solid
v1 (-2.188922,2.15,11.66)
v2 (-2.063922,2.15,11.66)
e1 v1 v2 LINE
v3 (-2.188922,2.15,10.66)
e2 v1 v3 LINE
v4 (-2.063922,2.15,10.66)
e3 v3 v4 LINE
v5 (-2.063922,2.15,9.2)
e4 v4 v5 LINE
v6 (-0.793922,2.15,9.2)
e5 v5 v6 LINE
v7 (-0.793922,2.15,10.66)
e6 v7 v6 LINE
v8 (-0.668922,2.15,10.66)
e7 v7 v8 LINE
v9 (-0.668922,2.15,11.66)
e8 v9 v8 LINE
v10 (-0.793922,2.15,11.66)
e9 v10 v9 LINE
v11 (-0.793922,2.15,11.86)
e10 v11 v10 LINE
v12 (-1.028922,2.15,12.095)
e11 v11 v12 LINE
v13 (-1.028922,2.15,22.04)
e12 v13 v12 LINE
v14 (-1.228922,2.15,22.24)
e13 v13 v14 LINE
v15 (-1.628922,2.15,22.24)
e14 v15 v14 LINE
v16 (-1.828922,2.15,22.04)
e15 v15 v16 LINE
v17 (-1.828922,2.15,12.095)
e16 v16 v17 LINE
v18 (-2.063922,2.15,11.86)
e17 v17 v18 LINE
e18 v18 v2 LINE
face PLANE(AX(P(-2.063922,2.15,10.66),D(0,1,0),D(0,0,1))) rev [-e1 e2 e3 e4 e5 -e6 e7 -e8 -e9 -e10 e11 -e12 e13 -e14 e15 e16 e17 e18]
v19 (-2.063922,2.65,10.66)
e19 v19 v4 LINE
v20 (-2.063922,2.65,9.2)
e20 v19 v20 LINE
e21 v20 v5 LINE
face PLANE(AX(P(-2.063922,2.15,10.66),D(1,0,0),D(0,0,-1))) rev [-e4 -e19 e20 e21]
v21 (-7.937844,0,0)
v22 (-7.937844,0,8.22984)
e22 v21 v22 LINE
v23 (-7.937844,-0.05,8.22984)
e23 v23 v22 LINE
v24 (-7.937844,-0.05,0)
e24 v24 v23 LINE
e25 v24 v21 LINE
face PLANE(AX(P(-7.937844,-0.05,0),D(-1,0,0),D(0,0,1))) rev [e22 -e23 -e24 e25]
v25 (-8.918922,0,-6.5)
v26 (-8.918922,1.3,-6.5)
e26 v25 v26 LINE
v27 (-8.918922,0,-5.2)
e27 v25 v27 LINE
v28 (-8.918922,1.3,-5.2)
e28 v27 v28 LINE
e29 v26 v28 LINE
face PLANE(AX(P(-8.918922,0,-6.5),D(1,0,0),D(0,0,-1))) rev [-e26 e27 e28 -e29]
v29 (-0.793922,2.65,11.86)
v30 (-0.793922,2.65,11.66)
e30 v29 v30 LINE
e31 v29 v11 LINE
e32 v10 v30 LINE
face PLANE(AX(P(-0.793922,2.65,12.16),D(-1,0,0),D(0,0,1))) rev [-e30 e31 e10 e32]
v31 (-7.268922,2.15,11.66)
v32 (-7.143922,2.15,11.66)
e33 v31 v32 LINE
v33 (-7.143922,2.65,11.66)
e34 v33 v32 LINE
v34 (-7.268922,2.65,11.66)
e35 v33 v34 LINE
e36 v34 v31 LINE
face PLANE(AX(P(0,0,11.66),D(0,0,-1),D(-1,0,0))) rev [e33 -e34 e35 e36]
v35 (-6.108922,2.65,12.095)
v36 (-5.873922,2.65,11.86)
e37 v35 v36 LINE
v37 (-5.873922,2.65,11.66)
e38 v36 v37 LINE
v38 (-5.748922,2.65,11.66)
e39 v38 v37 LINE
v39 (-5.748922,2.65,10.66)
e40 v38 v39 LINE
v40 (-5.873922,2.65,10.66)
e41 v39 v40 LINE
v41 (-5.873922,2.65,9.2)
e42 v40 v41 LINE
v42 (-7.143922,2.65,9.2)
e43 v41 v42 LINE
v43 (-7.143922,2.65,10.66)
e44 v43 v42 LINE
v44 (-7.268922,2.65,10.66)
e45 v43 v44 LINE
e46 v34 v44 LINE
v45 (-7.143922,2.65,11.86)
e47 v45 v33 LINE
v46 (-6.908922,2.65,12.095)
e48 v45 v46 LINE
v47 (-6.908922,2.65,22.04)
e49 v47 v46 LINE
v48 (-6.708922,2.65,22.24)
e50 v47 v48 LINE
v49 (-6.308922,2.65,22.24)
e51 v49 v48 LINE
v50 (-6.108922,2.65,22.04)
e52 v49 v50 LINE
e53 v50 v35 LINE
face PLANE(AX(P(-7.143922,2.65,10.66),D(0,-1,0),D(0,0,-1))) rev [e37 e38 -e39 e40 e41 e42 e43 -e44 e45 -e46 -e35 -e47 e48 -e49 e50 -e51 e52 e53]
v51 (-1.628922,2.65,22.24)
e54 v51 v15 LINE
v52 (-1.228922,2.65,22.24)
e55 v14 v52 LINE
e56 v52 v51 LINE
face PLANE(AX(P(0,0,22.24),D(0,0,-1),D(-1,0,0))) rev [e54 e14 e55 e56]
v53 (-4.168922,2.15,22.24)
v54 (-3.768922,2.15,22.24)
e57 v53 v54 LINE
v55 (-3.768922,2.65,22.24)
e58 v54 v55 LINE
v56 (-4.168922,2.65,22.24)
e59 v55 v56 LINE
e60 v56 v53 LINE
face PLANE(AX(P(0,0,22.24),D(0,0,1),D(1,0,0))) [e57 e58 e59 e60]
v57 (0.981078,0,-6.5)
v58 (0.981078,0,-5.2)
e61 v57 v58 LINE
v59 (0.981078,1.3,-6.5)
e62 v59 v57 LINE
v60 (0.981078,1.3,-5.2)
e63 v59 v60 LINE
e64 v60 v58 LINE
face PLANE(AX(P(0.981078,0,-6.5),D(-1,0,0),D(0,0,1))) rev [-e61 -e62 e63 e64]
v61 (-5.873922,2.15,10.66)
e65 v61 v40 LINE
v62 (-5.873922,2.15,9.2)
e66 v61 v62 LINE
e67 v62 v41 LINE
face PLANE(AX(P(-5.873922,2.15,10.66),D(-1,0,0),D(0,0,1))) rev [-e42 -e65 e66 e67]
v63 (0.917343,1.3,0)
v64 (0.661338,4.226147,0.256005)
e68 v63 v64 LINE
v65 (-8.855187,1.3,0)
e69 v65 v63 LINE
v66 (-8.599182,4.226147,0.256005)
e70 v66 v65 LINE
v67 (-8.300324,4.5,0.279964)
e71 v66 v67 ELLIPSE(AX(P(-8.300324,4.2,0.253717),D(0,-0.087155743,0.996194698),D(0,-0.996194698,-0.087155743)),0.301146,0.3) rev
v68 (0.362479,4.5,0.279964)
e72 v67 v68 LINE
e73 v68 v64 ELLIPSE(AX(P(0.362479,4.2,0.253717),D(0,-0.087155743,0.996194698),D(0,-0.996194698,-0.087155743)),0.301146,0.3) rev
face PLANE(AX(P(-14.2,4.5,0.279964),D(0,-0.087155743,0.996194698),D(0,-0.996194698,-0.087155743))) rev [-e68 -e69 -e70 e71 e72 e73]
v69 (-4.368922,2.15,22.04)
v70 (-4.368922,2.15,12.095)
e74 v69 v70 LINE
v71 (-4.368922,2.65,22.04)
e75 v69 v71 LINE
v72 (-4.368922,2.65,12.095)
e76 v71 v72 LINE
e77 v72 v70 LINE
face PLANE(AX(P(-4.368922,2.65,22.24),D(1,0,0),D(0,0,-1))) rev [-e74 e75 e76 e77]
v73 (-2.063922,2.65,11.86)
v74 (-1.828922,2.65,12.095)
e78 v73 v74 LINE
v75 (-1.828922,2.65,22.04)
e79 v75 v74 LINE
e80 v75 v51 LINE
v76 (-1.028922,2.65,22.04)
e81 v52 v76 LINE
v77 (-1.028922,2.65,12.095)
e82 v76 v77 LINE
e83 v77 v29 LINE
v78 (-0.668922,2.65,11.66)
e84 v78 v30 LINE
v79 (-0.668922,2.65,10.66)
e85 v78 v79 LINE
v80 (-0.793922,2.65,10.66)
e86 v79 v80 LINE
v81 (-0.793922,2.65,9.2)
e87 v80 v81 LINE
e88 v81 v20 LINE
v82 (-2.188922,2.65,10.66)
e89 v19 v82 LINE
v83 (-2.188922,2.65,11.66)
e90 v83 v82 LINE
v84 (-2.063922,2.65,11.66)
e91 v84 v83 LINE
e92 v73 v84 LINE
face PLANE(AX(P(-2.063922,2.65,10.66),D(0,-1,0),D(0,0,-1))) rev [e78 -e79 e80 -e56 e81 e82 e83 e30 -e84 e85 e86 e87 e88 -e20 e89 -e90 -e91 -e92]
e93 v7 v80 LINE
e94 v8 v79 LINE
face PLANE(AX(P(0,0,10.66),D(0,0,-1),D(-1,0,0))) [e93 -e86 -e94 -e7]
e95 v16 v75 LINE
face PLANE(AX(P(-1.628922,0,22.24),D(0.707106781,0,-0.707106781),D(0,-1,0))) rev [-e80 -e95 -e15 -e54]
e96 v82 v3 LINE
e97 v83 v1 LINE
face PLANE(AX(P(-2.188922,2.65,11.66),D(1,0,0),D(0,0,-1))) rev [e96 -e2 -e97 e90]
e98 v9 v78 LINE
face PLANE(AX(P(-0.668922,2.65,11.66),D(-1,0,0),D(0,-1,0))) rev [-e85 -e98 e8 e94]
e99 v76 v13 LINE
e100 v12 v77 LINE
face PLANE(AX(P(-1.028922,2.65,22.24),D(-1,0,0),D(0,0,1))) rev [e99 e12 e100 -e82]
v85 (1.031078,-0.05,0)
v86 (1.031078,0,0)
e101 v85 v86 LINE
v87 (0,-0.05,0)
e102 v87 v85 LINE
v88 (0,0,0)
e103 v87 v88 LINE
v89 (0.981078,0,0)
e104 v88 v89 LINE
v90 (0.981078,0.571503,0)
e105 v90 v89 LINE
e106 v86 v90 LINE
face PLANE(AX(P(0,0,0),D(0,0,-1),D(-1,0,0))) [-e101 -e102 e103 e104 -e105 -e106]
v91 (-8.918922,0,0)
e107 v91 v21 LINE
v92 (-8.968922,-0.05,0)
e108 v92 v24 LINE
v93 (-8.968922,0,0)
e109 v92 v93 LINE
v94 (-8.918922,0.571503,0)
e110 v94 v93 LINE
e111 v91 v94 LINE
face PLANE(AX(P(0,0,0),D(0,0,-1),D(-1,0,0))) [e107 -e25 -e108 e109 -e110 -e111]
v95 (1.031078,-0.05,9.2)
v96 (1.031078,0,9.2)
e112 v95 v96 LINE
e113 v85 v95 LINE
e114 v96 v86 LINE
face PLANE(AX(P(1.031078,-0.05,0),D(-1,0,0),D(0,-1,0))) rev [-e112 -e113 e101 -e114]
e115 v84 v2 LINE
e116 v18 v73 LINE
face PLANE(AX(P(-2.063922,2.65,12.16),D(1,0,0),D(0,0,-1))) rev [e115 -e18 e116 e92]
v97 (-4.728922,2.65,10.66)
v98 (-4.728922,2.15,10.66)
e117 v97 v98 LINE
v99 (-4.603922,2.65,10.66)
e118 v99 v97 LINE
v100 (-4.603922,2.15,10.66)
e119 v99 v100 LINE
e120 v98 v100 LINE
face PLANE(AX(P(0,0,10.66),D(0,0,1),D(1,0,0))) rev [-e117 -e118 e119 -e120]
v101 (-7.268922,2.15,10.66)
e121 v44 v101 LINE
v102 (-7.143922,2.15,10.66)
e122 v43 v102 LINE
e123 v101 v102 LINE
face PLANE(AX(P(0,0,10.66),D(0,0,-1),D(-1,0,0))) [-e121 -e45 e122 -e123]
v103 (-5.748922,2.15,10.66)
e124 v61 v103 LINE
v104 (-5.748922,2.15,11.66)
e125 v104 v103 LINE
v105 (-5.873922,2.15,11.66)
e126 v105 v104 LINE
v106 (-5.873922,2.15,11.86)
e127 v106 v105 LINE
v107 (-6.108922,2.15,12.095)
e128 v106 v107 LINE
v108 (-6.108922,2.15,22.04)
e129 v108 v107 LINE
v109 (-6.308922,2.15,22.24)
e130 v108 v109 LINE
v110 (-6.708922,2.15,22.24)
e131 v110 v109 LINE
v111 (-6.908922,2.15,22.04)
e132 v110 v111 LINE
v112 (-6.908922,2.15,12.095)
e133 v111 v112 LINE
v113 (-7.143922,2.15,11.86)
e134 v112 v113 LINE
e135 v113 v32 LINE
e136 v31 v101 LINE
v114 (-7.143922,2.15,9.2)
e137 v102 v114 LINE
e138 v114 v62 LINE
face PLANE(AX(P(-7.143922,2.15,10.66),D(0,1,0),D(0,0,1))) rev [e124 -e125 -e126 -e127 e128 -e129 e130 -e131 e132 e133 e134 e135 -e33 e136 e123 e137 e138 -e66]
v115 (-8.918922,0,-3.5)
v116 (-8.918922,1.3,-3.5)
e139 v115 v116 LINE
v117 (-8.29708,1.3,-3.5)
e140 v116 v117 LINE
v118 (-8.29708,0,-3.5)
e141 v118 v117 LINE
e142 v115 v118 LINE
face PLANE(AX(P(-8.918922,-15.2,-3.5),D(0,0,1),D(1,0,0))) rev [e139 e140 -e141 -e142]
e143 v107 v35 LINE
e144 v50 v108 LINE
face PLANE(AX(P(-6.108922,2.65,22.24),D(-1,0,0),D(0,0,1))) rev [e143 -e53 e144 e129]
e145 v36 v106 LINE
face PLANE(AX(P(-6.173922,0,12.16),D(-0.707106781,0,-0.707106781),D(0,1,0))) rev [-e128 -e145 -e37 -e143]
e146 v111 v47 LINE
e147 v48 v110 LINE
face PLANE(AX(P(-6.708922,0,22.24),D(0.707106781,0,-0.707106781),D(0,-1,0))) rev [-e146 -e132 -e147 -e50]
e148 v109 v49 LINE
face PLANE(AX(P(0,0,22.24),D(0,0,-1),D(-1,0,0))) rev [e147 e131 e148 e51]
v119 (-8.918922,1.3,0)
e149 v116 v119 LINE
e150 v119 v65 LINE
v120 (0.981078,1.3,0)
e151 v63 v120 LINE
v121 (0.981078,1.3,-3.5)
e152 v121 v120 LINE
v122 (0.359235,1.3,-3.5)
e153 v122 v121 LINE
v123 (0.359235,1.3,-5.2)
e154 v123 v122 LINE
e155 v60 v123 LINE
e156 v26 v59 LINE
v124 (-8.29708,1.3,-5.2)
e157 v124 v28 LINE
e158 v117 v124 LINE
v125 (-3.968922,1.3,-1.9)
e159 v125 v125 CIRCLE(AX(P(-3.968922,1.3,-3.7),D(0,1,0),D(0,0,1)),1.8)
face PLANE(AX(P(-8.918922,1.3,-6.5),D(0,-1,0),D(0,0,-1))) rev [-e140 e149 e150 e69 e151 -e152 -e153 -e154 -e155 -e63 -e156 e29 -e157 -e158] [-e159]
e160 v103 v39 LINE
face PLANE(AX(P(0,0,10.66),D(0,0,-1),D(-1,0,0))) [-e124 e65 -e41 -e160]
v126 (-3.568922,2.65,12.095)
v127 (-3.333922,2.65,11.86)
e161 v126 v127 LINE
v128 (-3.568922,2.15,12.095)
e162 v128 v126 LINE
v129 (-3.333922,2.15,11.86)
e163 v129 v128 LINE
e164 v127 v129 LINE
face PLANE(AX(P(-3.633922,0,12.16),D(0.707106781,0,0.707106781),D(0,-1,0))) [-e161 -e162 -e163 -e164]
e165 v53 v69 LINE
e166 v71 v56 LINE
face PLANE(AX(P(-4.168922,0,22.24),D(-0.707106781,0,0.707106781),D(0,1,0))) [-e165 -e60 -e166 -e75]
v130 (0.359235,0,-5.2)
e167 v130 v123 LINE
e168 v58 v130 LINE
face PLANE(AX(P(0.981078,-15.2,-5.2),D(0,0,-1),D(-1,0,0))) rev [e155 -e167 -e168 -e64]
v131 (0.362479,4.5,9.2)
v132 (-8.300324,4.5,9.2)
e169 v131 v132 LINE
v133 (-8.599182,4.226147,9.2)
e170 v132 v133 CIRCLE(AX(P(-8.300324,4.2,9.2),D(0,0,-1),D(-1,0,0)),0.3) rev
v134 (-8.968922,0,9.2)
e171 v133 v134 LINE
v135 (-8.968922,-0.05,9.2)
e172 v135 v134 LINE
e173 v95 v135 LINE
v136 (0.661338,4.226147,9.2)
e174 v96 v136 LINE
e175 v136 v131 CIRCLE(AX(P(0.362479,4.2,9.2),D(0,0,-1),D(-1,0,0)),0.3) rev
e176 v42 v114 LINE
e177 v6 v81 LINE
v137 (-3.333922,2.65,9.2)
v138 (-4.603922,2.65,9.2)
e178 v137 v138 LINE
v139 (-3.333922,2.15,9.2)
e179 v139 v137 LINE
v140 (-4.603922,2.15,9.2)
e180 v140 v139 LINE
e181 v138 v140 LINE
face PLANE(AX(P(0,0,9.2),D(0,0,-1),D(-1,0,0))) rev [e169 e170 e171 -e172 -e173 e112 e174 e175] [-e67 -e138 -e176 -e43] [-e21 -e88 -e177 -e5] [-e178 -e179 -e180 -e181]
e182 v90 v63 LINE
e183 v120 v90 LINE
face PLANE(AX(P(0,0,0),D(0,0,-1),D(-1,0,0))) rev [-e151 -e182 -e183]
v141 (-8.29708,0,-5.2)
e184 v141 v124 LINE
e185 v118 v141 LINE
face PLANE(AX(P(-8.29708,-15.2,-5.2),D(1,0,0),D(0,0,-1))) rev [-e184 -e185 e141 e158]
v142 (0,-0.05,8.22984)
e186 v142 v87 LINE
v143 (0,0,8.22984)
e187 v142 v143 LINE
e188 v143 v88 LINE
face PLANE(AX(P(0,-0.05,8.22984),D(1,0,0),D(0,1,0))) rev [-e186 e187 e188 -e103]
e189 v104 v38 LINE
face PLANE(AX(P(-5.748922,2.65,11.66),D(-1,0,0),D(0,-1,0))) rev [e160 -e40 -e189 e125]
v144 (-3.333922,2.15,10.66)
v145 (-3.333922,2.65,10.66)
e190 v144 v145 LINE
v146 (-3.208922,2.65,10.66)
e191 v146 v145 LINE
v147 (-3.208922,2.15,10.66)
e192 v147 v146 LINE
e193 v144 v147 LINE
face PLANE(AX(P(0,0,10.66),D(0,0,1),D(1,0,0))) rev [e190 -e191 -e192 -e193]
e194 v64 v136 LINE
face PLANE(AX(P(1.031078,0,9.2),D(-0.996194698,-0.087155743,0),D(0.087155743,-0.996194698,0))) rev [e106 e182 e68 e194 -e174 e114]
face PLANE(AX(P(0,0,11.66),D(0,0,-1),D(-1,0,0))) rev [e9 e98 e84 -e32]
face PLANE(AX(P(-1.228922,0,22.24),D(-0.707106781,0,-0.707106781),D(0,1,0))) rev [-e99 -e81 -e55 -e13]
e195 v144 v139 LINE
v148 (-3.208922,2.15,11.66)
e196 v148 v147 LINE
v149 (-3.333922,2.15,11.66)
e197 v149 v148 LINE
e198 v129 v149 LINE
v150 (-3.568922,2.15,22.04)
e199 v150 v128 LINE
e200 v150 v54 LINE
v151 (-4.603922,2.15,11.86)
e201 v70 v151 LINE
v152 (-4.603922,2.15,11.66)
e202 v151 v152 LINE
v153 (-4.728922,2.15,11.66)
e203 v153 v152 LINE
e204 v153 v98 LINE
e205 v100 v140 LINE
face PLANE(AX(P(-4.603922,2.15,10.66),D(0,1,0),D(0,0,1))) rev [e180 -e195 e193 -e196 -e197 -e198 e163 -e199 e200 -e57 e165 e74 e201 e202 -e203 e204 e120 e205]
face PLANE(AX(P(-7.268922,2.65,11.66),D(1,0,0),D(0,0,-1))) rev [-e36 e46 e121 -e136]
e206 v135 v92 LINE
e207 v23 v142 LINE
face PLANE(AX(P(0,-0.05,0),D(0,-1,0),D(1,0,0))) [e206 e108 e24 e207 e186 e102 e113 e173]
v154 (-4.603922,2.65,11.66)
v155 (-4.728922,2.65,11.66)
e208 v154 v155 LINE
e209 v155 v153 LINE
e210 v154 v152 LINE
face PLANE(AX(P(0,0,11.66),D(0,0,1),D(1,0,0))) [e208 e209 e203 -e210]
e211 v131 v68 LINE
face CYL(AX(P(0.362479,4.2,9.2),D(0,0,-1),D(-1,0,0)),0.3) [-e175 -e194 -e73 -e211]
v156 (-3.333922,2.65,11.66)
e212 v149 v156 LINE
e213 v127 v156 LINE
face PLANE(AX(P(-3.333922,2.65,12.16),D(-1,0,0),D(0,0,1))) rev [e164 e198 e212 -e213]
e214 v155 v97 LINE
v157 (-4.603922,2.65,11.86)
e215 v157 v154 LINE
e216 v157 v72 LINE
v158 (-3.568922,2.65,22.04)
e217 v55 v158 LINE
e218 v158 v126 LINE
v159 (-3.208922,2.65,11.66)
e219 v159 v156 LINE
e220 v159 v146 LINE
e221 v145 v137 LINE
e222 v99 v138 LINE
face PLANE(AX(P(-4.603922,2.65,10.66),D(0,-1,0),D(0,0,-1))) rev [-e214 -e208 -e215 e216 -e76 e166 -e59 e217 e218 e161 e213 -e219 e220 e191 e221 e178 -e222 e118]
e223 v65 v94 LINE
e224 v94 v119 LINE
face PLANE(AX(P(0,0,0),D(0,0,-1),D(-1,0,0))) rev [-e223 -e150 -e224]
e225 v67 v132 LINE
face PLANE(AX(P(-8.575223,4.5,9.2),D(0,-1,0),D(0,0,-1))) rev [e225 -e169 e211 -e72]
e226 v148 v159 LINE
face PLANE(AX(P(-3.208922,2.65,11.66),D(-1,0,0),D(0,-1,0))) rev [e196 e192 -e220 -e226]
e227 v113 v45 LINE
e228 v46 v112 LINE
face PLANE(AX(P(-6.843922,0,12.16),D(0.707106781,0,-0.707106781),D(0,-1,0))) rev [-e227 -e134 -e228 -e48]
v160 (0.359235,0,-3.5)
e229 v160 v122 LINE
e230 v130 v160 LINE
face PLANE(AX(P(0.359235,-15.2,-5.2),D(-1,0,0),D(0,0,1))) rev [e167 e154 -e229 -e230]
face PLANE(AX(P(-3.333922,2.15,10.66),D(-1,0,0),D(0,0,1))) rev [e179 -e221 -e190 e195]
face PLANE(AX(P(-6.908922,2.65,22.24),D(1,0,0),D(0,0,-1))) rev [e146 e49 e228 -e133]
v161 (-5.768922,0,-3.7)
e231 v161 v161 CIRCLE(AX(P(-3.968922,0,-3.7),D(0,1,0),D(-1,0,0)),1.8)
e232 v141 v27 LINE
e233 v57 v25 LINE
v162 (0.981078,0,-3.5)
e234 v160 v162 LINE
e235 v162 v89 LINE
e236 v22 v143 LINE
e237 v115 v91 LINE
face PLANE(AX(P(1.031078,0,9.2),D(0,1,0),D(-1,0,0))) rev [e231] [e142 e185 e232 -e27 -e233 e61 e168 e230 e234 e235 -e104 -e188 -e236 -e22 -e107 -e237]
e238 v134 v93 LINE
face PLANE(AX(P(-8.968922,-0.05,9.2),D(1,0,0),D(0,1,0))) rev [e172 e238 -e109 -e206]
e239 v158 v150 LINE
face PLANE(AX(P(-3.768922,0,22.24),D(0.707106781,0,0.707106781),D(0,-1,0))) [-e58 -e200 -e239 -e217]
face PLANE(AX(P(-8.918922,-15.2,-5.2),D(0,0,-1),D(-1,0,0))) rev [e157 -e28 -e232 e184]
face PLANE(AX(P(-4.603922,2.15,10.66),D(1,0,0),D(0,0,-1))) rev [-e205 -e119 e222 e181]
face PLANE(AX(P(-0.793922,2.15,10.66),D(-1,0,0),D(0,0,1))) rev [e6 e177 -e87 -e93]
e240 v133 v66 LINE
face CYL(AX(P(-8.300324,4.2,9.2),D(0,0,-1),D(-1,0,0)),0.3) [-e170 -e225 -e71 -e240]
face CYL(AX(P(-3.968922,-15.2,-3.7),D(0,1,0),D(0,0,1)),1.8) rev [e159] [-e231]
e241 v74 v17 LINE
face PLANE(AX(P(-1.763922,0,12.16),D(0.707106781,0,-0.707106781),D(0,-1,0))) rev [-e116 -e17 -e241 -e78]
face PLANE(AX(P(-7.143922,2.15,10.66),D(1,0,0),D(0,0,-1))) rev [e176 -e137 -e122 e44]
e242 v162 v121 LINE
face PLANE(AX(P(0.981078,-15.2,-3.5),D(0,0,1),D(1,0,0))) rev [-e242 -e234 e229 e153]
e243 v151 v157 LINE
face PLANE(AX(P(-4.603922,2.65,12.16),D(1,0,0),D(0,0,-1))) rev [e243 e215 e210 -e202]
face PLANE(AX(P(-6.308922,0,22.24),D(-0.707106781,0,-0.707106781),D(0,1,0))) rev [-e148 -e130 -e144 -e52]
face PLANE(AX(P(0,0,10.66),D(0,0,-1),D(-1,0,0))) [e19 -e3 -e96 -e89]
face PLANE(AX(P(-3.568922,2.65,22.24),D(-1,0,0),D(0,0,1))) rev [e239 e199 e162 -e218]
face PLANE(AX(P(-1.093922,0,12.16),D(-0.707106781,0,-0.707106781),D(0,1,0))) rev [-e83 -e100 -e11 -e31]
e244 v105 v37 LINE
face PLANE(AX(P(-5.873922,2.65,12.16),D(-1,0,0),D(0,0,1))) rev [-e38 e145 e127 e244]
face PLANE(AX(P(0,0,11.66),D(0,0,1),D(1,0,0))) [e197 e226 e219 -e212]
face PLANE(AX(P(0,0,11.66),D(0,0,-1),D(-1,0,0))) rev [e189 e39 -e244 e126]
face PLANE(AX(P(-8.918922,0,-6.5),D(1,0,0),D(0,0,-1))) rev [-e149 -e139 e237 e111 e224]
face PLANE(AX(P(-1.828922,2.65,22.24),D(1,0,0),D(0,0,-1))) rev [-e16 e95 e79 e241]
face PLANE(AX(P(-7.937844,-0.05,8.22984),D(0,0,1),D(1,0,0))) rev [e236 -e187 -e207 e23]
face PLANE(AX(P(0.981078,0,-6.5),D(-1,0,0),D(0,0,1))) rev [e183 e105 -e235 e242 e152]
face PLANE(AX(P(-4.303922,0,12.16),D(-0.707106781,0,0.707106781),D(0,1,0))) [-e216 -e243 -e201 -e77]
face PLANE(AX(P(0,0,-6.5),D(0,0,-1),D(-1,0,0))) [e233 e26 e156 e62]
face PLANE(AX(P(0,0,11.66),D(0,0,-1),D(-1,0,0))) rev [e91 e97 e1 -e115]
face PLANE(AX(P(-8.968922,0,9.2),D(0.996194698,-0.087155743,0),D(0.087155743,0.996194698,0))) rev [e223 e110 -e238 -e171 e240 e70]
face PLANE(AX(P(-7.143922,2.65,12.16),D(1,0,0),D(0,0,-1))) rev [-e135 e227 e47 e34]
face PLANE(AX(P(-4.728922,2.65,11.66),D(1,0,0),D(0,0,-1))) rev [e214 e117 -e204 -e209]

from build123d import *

# Parameters (mm, degrees)
BOSS_EXTRUDE1_DEPTH  = 9.2
FILLET1_R            = 0.3
CUT_EXTRUDE1_DEPTH   = 19.2
SKETCH3_W            = 9.9
SKETCH3_H            = 1.3
BOSS_EXTRUDE2_DEPTH  = 6.5
SKETCH4_W            = 0.621842352
SKETCH4_H            = 1.7
CUT_EXTRUDE3_DEPTH   = 16.5
SKETCH5_R            = 1.8
CUT_EXTRUDE4_DEPTH   = 16.5
SKETCH8_W            = 1.27
SKETCH8_H            = 0.5
BOSS_EXTRUDE4_DEPTH  = 1.46
SKETCH9_W            = 1.52
SKETCH9_H            = 0.5
BOSS_EXTRUDE5_DEPTH  = 1
SKETCH10_W           = 1.27
SKETCH10_H           = 0.5
BOSS_EXTRUDE6_DEPTH  = 0.5
SKETCH11_W           = 0.8
SKETCH11_H           = 0.5
BOSS_EXTRUDE7_DEPTH  = 10.08
CHAMFER1_SIZE        = 0.3
CHAMFER2_SIZE        = 0.2
BOSS_EXTRUDE10_DEPTH = 0.05


with BuildPart() as part:
    # Sketch1 → Boss-Extrude1 (new body)
    with BuildSketch(Plane.XY):
        Polygon((1.031077827, 0), (-8.968922173, 0), (-8.575223187, 4.5), (0.637378841, 4.5), align=None)
    extrude(amount=BOSS_EXTRUDE1_DEPTH)

    # Fillet1
    fillet1_edges = [part.edges().sort_by_distance(p)[0] for p in [
        (-8.575223187, 4.5, 4.6),
        (0.637378841, 4.5, 4.6),
    ]]
    fillet(fillet1_edges, radius=FILLET1_R)

    # Sketch2 → Cut-Extrude1 (cut)
    with BuildSketch(Plane(origin=(5, 0, 0), x_dir=(0, 0, -1), z_dir=(1, 0, 0))):
        Polygon((0, 4.5), (-0.279963723, 4.5), (0, 1.3), align=None)
    extrude(amount=-CUT_EXTRUDE1_DEPTH, mode=Mode.SUBTRACT)

    # Sketch3 → Boss-Extrude2 (add)
    with BuildSketch(Plane(origin=(0, 0, 0), x_dir=(-1, 0, 0), z_dir=(0, 0, -1))):
        with Locations((3.968922173, 0.65)):
            Rectangle(SKETCH3_W, SKETCH3_H)
    extrude(amount=BOSS_EXTRUDE2_DEPTH)

    # Sketch4 → Cut-Extrude3 (cut)
    with BuildSketch(Plane(origin=(0, 1.3, 0), x_dir=(1, 0, 0), z_dir=(0, 1, 0))):
        with Locations((-8.608000997, 4.35)):
            Rectangle(SKETCH4_W, SKETCH4_H)
        with Locations((0.670156651, 4.35)):
            Rectangle(SKETCH4_W, SKETCH4_H)
    extrude(amount=-CUT_EXTRUDE3_DEPTH, mode=Mode.SUBTRACT)

    # Sketch5 → Cut-Extrude4 (cut)
    with BuildSketch(Plane(origin=(0, 1.3, 0), x_dir=(1, 0, 0), z_dir=(0, 1, 0))):
        with Locations(Location((-3.968922173, 3.7, 0), (0, 0, 270))):
            Circle(SKETCH5_R)
    extrude(amount=-CUT_EXTRUDE4_DEPTH, mode=Mode.SUBTRACT)

    # Sketch8 → Boss-Extrude4 (add)
    with BuildSketch(Plane.XY.offset(9.2)):
        with Locations((-1.428922173, 2.4)):
            Rectangle(SKETCH8_W, SKETCH8_H)
        with Locations((-3.968922173, 2.4)):
            Rectangle(SKETCH8_W, SKETCH8_H)
        with Locations((-6.508922173, 2.4)):
            Rectangle(SKETCH8_W, SKETCH8_H)
    extrude(amount=BOSS_EXTRUDE4_DEPTH)

    # Sketch9 → Boss-Extrude5 (add)
    with BuildSketch(Plane.XY.offset(10.66)):
        with Locations((-3.968922173, 2.4)):
            Rectangle(SKETCH9_W, SKETCH9_H)
        with Locations((-1.428922173, 2.4)):
            Rectangle(SKETCH9_W, SKETCH9_H)
        with Locations((-6.508922173, 2.4)):
            Rectangle(SKETCH9_W, SKETCH9_H)
    extrude(amount=BOSS_EXTRUDE5_DEPTH)

    # Sketch10 → Boss-Extrude6 (add)
    with BuildSketch(Plane.XY.offset(11.66)):
        with Locations((-3.968922173, 2.4)):
            Rectangle(SKETCH10_W, SKETCH10_H)
        with Locations((-1.428922173, 2.4)):
            Rectangle(SKETCH10_W, SKETCH10_H)
        with Locations((-6.508922173, 2.4)):
            Rectangle(SKETCH10_W, SKETCH10_H)
    extrude(amount=BOSS_EXTRUDE6_DEPTH)

    # Sketch11 → Boss-Extrude7 (add)
    with BuildSketch(Plane.XY.offset(12.16)):
        with Locations((-3.968922173, 2.4)):
            Rectangle(SKETCH11_W, SKETCH11_H)
        with Locations((-1.428922173, 2.4)):
            Rectangle(SKETCH11_W, SKETCH11_H)
        with Locations((-6.508922173, 2.4)):
            Rectangle(SKETCH11_W, SKETCH11_H)
    extrude(amount=BOSS_EXTRUDE7_DEPTH)

    # Chamfer1
    # the kernel refuses this chamfer: 0.3 mm, written as the material it takes off along each edge
    with BuildSketch(Plane(origin=(-0.793922173, 3.421504896, 12.16), x_dir=(-0.9996219169112968, 0, 0.027495876610584464), z_dir=(0, -1, 0))) as chamfer1_piece_1_section:
        Polygon((CHAMFER1_SIZE * 0.999621916911, CHAMFER1_SIZE * 0.0274958766106), (-CHAMFER1_SIZE * 0.0274958766106, CHAMFER1_SIZE * 0.999621916911), (0, 0), align=None)
    chamfer1_piece_1 = extrude(amount=2.043009793, mode=Mode.PRIVATE)
    chamfer1_piece_1 = split(chamfer1_piece_1, bisect_by=Plane(origin=(-1.028922173, 2.4, 12.055687512), z_dir=(1, 0, 0)), keep=Keep.TOP, mode=Mode.PRIVATE)
    add(chamfer1_piece_1, mode=Mode.SUBTRACT)
    with BuildSketch(Plane(origin=(-2.063922173, 1.378495104, 12.16), x_dir=(-0.027495876610585904, 0, -0.9996219169112968), z_dir=(0, 1, 0))) as chamfer1_piece_2_section:
        Polygon((CHAMFER1_SIZE * 0.999621916911, -CHAMFER1_SIZE * 0.0274958766106), (-CHAMFER1_SIZE * 0.0274958766106, -CHAMFER1_SIZE * 0.999621916911), (0, 0), align=None)
    chamfer1_piece_2 = extrude(amount=2.043009793, mode=Mode.PRIVATE)
    chamfer1_piece_2 = split(chamfer1_piece_2, bisect_by=Plane(origin=(-1.828922173, 2.4, 12.055687512), z_dir=(-1, 0, 0)), keep=Keep.TOP, mode=Mode.PRIVATE)
    add(chamfer1_piece_2, mode=Mode.SUBTRACT)
    with BuildSketch(Plane(origin=(-4.603922173, 1.378495104, 12.16), x_dir=(-0.027495876610587344, 0, -0.9996219169112968), z_dir=(0, 1, 0))) as chamfer1_piece_3_section:
        Polygon((CHAMFER1_SIZE * 0.999621916911, -CHAMFER1_SIZE * 0.0274958766106), (-CHAMFER1_SIZE * 0.0274958766106, -CHAMFER1_SIZE * 0.999621916911), (0, 0), align=None)
    chamfer1_piece_3 = extrude(amount=2.043009793, mode=Mode.PRIVATE)
    chamfer1_piece_3 = split(chamfer1_piece_3, bisect_by=Plane(origin=(-4.368922173, 2.4, 12.055687512), z_dir=(-1, 0, 0)), keep=Keep.TOP, mode=Mode.PRIVATE)
    add(chamfer1_piece_3, mode=Mode.SUBTRACT)
    with BuildSketch(Plane(origin=(-3.333922173, 3.421504896, 12.16), x_dir=(-0.9996219169112968, 0, 0.027495876610584506), z_dir=(0, -1, 0))) as chamfer1_piece_4_section:
        Polygon((CHAMFER1_SIZE * 0.999621916911, CHAMFER1_SIZE * 0.0274958766106), (-CHAMFER1_SIZE * 0.0274958766106, CHAMFER1_SIZE * 0.999621916911), (0, 0), align=None)
    chamfer1_piece_4 = extrude(amount=2.043009793, mode=Mode.PRIVATE)
    chamfer1_piece_4 = split(chamfer1_piece_4, bisect_by=Plane(origin=(-3.568922173, 2.4, 12.055687512), z_dir=(1, 0, 0)), keep=Keep.TOP, mode=Mode.PRIVATE)
    add(chamfer1_piece_4, mode=Mode.SUBTRACT)
    with BuildSketch(Plane(origin=(-7.143922173, 1.378495104, 12.16), x_dir=(-0.027495876610587344, 0, -0.9996219169112968), z_dir=(0, 1, 0))) as chamfer1_piece_5_section:
        Polygon((CHAMFER1_SIZE * 0.999621916911, -CHAMFER1_SIZE * 0.0274958766106), (-CHAMFER1_SIZE * 0.0274958766106, -CHAMFER1_SIZE * 0.999621916911), (0, 0), align=None)
    chamfer1_piece_5 = extrude(amount=2.043009793, mode=Mode.PRIVATE)
    chamfer1_piece_5 = split(chamfer1_piece_5, bisect_by=Plane(origin=(-6.908922173, 2.4, 12.055687512), z_dir=(-1, 0, 0)), keep=Keep.TOP, mode=Mode.PRIVATE)
    add(chamfer1_piece_5, mode=Mode.SUBTRACT)
    with BuildSketch(Plane(origin=(-5.873922173, 3.421504896, 12.16), x_dir=(-0.9996219169112968, 0, 0.027495876610584464), z_dir=(0, -1, 0))) as chamfer1_piece_6_section:
        Polygon((CHAMFER1_SIZE * 0.999621916911, CHAMFER1_SIZE * 0.0274958766106), (-CHAMFER1_SIZE * 0.0274958766106, CHAMFER1_SIZE * 0.999621916911), (0, 0), align=None)
    chamfer1_piece_6 = extrude(amount=2.043009793, mode=Mode.PRIVATE)
    chamfer1_piece_6 = split(chamfer1_piece_6, bisect_by=Plane(origin=(-6.108922173, 2.4, 12.055687512), z_dir=(1, 0, 0)), keep=Keep.TOP, mode=Mode.PRIVATE)
    add(chamfer1_piece_6, mode=Mode.SUBTRACT)

    # Chamfer2
    chamfer2_edges = [part.edges().sort_by_distance(p)[0] for p in [
        (-3.568922173, 2.4, 22.24),
        (-4.368922173, 2.4, 22.24),
        (-6.108922173, 2.4, 22.24),
        (-6.908922173, 2.4, 22.24),
        (-1.028922173, 2.4, 22.24),
        (-1.828922173, 2.4, 22.24),
    ]]
    chamfer(chamfer2_edges, length=CHAMFER2_SIZE)

    # Sketch15 → Boss-Extrude10 (add)
    with BuildSketch(Plane(origin=(0, 0, 0), x_dir=(-1, 0, 0), z_dir=(0, -1, 0))):
        Polygon((8.968922173, 0), (7.937844346, 0), (7.937844346, -8.229840369), (0, -8.229840369), (0, 0), (-1.031077827, 0), (-1.031077827, -9.2), (8.968922173, -9.2), align=None)
    extrude(amount=BOSS_EXTRUDE10_DEPTH)


solid = part.part
